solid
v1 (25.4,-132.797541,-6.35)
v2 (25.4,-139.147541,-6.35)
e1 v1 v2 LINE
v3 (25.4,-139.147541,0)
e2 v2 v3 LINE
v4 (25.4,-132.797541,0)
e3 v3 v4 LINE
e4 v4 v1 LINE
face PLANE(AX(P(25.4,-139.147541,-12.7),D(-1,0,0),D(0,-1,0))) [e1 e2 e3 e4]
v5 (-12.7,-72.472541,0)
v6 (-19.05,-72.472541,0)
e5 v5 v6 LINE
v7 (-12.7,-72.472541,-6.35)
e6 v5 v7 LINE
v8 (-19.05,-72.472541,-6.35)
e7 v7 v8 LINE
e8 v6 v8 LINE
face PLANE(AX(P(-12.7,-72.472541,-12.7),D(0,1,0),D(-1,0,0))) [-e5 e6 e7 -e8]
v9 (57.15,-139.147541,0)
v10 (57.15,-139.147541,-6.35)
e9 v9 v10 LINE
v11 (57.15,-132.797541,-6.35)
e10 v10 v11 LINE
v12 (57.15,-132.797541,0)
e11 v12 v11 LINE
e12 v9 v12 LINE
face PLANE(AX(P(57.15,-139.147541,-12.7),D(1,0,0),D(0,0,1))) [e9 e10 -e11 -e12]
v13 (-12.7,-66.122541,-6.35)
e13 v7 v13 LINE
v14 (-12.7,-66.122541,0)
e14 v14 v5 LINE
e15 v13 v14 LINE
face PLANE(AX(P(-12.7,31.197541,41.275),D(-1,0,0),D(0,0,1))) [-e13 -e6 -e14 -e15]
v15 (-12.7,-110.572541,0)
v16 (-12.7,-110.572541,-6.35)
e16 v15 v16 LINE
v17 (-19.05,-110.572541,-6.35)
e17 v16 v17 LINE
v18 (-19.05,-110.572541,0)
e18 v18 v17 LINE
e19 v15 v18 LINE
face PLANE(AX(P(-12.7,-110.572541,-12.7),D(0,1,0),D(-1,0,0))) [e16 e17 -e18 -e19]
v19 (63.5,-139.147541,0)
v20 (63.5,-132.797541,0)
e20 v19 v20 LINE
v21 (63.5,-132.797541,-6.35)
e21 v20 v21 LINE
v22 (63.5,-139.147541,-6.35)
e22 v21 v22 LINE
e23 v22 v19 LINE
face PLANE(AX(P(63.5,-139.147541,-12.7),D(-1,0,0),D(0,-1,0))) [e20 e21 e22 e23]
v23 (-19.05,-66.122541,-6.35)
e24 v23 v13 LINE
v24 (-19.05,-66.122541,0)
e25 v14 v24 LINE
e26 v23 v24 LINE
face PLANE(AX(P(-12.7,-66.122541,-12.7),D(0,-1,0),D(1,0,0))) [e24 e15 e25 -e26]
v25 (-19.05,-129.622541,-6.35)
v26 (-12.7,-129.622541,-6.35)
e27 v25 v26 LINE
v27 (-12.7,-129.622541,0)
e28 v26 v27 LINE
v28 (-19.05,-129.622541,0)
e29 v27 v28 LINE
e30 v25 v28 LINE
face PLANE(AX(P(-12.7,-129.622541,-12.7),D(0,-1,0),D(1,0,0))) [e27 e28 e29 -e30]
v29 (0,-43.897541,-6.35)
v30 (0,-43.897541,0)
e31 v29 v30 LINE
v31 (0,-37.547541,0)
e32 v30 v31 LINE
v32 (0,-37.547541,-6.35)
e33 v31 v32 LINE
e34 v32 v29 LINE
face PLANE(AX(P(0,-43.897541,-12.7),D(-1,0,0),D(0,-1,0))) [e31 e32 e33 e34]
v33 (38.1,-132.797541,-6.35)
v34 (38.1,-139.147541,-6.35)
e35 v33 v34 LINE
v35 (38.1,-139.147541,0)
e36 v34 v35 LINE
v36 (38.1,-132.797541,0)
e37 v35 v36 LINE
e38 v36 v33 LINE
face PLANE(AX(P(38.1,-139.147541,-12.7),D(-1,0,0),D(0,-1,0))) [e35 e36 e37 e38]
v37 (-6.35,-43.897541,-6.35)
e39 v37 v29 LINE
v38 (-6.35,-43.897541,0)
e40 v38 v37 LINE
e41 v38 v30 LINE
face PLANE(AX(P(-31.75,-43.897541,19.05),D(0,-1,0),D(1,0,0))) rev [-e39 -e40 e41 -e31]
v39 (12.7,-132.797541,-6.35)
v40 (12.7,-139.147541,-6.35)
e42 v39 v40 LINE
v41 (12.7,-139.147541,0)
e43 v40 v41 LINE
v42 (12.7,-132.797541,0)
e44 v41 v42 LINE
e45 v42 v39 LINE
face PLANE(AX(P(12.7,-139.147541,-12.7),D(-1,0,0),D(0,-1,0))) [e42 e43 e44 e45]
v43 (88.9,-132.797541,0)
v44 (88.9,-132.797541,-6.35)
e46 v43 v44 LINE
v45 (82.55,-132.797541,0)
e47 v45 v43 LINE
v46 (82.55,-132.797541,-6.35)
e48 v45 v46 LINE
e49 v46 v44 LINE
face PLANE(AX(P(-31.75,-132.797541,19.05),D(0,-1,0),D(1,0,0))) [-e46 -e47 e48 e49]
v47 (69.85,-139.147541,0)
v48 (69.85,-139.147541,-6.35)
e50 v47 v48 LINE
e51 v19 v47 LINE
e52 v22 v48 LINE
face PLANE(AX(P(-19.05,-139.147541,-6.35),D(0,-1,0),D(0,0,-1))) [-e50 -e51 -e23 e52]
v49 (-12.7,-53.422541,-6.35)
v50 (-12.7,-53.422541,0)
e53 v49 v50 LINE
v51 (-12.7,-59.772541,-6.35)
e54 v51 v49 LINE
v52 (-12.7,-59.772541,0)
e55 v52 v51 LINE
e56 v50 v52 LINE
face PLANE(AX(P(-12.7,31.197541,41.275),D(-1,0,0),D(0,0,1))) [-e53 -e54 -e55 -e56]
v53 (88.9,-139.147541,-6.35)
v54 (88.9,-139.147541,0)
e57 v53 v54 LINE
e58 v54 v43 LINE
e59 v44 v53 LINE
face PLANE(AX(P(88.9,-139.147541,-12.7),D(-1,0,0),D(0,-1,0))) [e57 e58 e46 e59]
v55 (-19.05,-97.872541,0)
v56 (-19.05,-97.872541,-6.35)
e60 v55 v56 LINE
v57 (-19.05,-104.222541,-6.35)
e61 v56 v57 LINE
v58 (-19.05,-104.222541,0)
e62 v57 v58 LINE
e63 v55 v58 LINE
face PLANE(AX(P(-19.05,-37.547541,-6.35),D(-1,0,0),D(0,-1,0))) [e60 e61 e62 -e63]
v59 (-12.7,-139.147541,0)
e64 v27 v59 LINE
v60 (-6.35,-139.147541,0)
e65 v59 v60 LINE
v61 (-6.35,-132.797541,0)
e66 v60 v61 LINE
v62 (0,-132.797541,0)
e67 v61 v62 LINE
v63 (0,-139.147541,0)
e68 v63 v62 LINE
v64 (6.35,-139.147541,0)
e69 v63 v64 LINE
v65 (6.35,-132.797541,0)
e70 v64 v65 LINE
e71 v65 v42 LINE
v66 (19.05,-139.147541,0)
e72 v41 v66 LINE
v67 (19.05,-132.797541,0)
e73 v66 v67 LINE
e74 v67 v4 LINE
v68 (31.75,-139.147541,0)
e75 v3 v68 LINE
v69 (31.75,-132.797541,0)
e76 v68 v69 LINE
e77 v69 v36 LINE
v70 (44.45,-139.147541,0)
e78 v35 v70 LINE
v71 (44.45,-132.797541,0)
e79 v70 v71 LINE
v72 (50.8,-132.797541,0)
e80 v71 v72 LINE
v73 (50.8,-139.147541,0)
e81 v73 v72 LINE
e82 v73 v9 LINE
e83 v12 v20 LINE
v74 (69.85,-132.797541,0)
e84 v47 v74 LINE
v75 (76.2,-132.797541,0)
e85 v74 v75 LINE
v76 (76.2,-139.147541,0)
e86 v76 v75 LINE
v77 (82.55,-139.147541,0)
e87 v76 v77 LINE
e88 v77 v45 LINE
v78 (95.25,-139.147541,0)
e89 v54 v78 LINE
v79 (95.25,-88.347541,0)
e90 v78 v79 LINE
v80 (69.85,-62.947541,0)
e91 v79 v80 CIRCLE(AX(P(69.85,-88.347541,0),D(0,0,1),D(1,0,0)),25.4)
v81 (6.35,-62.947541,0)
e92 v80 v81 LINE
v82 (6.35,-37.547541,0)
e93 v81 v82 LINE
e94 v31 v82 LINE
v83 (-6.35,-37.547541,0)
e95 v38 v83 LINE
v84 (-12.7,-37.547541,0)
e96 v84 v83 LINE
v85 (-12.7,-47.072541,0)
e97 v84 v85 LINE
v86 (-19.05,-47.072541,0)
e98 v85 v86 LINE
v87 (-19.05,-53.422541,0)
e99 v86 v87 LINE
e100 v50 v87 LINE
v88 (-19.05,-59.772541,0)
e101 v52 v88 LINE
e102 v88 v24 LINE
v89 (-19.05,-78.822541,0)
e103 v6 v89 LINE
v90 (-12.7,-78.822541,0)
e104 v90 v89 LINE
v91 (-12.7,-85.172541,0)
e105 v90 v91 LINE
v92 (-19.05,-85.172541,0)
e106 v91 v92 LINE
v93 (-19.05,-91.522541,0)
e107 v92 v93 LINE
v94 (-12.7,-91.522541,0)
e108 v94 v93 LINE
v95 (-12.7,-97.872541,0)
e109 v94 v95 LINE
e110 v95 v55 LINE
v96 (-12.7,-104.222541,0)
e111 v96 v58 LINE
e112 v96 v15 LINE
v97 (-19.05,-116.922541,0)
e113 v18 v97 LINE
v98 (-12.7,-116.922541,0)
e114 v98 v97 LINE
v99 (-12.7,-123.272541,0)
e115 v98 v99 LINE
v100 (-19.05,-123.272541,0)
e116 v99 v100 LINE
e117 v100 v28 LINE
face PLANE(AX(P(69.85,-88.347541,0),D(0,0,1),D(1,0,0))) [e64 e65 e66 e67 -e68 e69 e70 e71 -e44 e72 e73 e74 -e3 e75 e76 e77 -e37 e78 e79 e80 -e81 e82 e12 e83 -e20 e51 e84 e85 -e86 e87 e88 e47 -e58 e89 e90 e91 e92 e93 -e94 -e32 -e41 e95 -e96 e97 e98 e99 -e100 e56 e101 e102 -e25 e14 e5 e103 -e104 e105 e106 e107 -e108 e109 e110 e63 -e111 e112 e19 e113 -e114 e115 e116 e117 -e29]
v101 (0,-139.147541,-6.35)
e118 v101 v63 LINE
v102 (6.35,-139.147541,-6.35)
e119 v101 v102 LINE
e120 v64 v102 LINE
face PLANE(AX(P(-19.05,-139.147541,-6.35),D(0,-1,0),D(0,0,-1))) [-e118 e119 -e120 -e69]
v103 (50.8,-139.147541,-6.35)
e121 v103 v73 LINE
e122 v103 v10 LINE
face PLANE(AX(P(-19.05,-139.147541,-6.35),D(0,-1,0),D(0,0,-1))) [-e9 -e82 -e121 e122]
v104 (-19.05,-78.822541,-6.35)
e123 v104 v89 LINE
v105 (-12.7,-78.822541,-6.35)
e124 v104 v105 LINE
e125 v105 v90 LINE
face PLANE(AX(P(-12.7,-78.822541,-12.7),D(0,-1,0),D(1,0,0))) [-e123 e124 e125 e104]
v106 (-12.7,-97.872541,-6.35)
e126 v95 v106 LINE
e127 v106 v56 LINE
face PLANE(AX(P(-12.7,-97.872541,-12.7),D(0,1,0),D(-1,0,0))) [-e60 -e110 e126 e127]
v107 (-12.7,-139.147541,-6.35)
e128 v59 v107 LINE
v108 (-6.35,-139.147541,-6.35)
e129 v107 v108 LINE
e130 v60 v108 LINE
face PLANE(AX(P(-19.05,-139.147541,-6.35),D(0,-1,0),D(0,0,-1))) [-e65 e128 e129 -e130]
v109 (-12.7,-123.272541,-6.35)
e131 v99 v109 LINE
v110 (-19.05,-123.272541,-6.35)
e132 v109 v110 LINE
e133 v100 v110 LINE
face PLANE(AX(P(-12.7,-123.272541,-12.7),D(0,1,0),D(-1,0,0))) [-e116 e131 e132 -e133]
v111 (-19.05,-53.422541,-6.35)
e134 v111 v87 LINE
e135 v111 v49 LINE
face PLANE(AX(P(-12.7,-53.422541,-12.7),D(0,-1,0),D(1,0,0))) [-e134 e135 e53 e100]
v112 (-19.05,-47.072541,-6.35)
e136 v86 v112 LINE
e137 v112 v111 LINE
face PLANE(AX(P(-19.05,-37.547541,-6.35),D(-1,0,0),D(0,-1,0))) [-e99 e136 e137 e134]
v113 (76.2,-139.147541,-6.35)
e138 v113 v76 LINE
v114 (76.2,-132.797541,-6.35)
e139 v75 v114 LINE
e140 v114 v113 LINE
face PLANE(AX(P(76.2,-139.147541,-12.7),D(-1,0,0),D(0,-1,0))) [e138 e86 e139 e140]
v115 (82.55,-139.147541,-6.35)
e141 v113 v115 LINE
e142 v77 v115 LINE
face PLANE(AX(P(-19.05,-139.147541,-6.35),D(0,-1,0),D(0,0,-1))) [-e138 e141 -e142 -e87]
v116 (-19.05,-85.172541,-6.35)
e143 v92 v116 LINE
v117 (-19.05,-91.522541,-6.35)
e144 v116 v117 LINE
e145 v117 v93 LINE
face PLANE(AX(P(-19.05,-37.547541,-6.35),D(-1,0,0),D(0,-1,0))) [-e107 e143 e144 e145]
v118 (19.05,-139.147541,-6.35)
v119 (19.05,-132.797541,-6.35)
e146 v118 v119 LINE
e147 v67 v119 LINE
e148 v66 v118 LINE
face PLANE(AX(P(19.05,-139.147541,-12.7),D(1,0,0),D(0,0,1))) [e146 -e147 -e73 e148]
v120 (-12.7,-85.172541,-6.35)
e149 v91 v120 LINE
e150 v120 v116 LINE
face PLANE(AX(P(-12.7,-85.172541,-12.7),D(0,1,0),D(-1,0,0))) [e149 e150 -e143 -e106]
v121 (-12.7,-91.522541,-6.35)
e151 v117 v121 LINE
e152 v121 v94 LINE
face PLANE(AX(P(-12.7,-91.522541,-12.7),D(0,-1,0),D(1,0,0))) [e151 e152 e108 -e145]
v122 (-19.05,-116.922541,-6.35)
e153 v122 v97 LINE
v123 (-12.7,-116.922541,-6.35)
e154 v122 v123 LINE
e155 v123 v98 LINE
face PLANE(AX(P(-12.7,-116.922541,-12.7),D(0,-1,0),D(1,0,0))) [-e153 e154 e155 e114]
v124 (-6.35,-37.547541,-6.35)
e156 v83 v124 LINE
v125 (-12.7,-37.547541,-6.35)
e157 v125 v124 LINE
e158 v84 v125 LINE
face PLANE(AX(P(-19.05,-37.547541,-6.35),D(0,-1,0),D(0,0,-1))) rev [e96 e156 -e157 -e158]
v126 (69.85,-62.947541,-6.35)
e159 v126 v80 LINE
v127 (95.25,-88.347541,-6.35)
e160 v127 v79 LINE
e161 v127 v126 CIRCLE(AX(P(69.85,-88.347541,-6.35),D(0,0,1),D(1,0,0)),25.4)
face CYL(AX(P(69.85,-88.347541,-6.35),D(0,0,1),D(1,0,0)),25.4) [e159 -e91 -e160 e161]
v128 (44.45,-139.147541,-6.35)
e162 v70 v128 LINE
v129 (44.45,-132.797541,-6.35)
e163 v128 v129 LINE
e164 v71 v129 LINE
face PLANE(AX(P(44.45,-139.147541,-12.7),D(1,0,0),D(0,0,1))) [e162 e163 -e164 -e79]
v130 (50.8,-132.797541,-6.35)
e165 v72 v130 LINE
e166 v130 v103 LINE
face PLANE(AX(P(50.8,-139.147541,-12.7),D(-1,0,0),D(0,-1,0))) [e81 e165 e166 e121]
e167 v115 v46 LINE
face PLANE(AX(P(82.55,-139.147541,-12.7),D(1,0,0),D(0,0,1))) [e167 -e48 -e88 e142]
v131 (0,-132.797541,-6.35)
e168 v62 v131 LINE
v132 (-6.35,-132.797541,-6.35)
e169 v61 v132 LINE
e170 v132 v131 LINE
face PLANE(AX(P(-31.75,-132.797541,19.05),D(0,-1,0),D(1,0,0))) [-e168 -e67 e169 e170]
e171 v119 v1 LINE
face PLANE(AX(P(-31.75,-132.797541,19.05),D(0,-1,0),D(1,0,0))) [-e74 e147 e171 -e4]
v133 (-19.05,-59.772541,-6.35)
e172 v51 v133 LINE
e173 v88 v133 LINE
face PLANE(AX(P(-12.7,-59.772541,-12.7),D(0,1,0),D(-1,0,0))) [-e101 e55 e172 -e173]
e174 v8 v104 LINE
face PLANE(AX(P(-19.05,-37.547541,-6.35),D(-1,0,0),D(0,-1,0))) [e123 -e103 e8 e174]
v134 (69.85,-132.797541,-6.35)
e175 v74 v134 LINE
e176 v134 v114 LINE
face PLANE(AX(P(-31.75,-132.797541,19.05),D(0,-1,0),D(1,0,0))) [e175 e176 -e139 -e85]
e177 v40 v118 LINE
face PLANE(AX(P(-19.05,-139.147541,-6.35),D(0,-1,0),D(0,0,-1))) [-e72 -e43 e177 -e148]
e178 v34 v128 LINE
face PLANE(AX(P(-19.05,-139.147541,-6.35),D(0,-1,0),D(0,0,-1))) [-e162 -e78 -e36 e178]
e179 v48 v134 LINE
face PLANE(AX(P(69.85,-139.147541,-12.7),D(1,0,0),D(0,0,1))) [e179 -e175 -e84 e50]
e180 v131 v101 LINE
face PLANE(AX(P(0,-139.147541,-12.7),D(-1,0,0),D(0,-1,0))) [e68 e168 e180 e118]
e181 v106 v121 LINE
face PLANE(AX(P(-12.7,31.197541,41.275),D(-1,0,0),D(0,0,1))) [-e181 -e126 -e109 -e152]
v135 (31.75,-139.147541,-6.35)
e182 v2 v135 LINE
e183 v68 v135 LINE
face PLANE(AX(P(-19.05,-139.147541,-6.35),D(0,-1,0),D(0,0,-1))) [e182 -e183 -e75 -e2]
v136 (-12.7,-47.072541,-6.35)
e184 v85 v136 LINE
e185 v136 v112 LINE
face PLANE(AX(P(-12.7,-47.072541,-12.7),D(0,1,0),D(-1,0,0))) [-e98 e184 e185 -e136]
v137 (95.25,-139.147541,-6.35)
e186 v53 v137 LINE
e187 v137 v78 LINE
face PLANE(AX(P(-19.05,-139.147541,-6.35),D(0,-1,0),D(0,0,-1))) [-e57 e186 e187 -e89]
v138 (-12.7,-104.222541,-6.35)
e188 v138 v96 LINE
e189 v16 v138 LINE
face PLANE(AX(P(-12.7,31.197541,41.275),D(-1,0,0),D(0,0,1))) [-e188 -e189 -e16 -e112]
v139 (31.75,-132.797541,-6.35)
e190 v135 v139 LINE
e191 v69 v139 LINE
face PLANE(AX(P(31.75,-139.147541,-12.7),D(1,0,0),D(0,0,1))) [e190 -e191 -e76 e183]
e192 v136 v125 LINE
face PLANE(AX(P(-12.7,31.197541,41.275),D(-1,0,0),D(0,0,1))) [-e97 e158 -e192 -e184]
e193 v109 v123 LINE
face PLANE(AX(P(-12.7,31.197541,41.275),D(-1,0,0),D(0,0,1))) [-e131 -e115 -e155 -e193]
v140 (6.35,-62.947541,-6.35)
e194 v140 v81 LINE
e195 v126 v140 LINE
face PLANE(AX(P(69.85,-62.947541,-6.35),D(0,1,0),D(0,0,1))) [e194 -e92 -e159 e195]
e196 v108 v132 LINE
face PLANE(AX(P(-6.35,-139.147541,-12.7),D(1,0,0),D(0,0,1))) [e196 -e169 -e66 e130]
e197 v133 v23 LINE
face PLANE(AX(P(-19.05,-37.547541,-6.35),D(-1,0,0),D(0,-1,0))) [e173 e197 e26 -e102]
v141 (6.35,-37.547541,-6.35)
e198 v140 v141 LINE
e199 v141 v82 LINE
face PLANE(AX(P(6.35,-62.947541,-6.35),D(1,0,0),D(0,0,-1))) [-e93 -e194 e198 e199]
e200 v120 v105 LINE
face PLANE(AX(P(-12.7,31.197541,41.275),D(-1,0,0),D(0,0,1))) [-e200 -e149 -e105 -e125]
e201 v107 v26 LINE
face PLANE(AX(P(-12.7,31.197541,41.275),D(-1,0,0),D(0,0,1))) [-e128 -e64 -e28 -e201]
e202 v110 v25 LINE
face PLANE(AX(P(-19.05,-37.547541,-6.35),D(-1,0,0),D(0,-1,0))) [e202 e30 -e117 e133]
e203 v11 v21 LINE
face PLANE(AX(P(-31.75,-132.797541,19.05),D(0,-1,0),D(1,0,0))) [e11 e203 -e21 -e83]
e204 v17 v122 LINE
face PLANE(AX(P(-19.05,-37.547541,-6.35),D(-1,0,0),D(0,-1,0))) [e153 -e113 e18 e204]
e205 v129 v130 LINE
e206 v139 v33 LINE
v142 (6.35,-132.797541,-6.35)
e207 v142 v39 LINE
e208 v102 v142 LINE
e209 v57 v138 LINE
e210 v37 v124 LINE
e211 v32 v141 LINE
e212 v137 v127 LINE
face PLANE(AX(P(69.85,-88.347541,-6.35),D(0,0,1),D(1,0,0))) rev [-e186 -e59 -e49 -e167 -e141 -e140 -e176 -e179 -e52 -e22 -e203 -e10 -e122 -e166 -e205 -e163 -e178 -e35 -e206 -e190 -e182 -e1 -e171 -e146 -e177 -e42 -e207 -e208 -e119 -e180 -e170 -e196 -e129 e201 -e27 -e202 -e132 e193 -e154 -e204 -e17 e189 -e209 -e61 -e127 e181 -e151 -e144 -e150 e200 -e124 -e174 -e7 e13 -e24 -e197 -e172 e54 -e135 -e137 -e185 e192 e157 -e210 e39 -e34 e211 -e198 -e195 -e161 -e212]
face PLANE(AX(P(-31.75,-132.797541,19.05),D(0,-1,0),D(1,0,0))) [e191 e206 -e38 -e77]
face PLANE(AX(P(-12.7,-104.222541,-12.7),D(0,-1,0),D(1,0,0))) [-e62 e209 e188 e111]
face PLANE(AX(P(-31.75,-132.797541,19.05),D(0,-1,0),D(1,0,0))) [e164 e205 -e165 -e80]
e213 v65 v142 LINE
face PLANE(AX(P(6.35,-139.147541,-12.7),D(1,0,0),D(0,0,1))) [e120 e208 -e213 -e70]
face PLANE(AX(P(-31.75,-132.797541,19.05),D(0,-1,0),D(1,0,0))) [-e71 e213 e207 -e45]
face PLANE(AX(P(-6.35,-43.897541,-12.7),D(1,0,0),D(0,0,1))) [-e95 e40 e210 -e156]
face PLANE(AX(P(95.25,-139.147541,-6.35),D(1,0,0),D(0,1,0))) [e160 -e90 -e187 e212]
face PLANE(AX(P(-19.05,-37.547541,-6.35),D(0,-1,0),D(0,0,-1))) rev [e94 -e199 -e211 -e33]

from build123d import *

# Parameters (mm, degrees)
BOSS_EXTRUDE1_DEPTH = 6.35
CAVITY2_START       = -19.049999998
CAVITY2_OUTLINE_W   = 9.525
CAVITY2_OUTLINE_H   = 6.35
CAVITY2_OUTLINE_W_2 = 6.35
CAVITY2_DEPTH       = 6.35
CAVITY2_START_2     = -6.349999998
CAVITY2_2_OUTLINE_W = 6.35
CAVITY2_2_OUTLINE_H = 6.35
CAVITY2_2_DEPTH     = 6.35
CAVITY2_START_3     = 6.350000002
CAVITY2_3_OUTLINE_W = 6.35
CAVITY2_3_OUTLINE_H = 6.35
CAVITY2_3_DEPTH     = 6.35
CAVITY2_START_4     = 19.050000002
CAVITY2_4_OUTLINE_W = 6.35
CAVITY2_4_OUTLINE_H = 6.35
CAVITY2_4_DEPTH     = 6.35
CAVITY2_START_5     = 31.750000002
CAVITY2_5_OUTLINE_W = 6.35
CAVITY2_5_OUTLINE_H = 6.35
CAVITY2_5_DEPTH     = 6.35
CAVITY2_START_6     = 44.450000002
CAVITY2_6_OUTLINE_W = 6.35
CAVITY2_6_OUTLINE_H = 6.35
CAVITY2_6_DEPTH     = 6.35
CAVITY2_START_7     = 57.150000002
CAVITY2_7_OUTLINE_W = 6.35
CAVITY2_7_OUTLINE_H = 6.35
CAVITY2_7_DEPTH     = 6.35
CAVITY2_START_8     = 69.850000002
CAVITY2_8_OUTLINE_W = 6.35
CAVITY2_8_OUTLINE_H = 6.35
CAVITY2_8_DEPTH     = 6.35
CAVITY2_START_9     = 82.550000002
CAVITY2_9_OUTLINE_W = 6.35
CAVITY2_9_OUTLINE_H = 6.35
CAVITY2_9_DEPTH     = 6.35


# Read off the part's stored shape, not the designer's step: Cavity2
with BuildPart() as part:
    # Sketch1 → Boss-Extrude1 (new body)
    with BuildSketch(Plane.XY):
        with BuildLine():
            Line((-19.049999998, -37.547541155), (6.350000002, -37.547541155))
            Line((6.350000002, -37.547541155), (6.350000002, -62.947541155))
            Line((6.350000002, -62.947541155), (69.850000002, -62.947541155))
            ThreePointArc((69.850000002, -62.947541155), (87.810512244, -70.387028913), (95.250000002, -88.347541155))
            Line((95.250000002, -88.347541155), (95.250000002, -139.147541155))
            Line((95.250000002, -139.147541155), (-19.049999998, -139.147541155))
            Line((-19.049999998, -139.147541155), (-19.049999998, -37.547541155))
        make_face()
    extrude(amount=-BOSS_EXTRUDE1_DEPTH)

    # Cavity2 outline → Cavity2 (cut)
    with BuildSketch(Plane.YZ.offset(CAVITY2_START)):
        with Locations((-134.385041155, -3.175)):
            Rectangle(CAVITY2_OUTLINE_W, CAVITY2_OUTLINE_H)
        with Locations((-120.097541155, -3.175)):
            Rectangle(CAVITY2_OUTLINE_W_2, CAVITY2_OUTLINE_H)
        with Locations((-107.397541155, -3.175)):
            Rectangle(CAVITY2_OUTLINE_W_2, CAVITY2_OUTLINE_H)
        with Locations((-94.697541155, -3.175)):
            Rectangle(CAVITY2_OUTLINE_W_2, CAVITY2_OUTLINE_H)
        with Locations((-81.997541155, -3.175)):
            Rectangle(CAVITY2_OUTLINE_W_2, CAVITY2_OUTLINE_H)
        with Locations((-69.297541155, -3.175)):
            Rectangle(CAVITY2_OUTLINE_W_2, CAVITY2_OUTLINE_H)
        with Locations((-56.597541155, -3.175)):
            Rectangle(CAVITY2_OUTLINE_W_2, CAVITY2_OUTLINE_H)
        with Locations((-42.310041155, -3.175)):
            Rectangle(CAVITY2_OUTLINE_W, CAVITY2_OUTLINE_H)
    extrude(amount=CAVITY2_DEPTH, mode=Mode.SUBTRACT)

    # Cavity2 2 outline → Cavity2 2 (cut)
    with BuildSketch(Plane.YZ.offset(CAVITY2_START_2)):
        with Locations((-135.972541155, -3.175)):
            Rectangle(CAVITY2_2_OUTLINE_W, CAVITY2_2_OUTLINE_H)
        with Locations((-40.722541155, -3.175)):
            Rectangle(CAVITY2_2_OUTLINE_W, CAVITY2_2_OUTLINE_H)
    extrude(amount=CAVITY2_2_DEPTH, mode=Mode.SUBTRACT)

    # Cavity2 3 outline → Cavity2 3 (cut)
    with BuildSketch(Plane.YZ.offset(CAVITY2_START_3)):
        with Locations((-135.972541155, -3.175)):
            Rectangle(CAVITY2_3_OUTLINE_W, CAVITY2_3_OUTLINE_H)
    extrude(amount=CAVITY2_3_DEPTH, mode=Mode.SUBTRACT)

    # Cavity2 4 outline → Cavity2 4 (cut)
    with BuildSketch(Plane.YZ.offset(CAVITY2_START_4)):
        with Locations((-135.972541155, -3.175)):
            Rectangle(CAVITY2_4_OUTLINE_W, CAVITY2_4_OUTLINE_H)
    extrude(amount=CAVITY2_4_DEPTH, mode=Mode.SUBTRACT)

    # Cavity2 5 outline → Cavity2 5 (cut)
    with BuildSketch(Plane.YZ.offset(CAVITY2_START_5)):
        with Locations((-135.972541155, -3.175)):
            Rectangle(CAVITY2_5_OUTLINE_W, CAVITY2_5_OUTLINE_H)
    extrude(amount=CAVITY2_5_DEPTH, mode=Mode.SUBTRACT)

    # Cavity2 6 outline → Cavity2 6 (cut)
    with BuildSketch(Plane.YZ.offset(CAVITY2_START_6)):
        with Locations((-135.972541155, -3.175)):
            Rectangle(CAVITY2_6_OUTLINE_W, CAVITY2_6_OUTLINE_H)
    extrude(amount=CAVITY2_6_DEPTH, mode=Mode.SUBTRACT)

    # Cavity2 7 outline → Cavity2 7 (cut)
    with BuildSketch(Plane.YZ.offset(CAVITY2_START_7)):
        with Locations((-135.972541155, -3.175)):
            Rectangle(CAVITY2_7_OUTLINE_W, CAVITY2_7_OUTLINE_H)
    extrude(amount=CAVITY2_7_DEPTH, mode=Mode.SUBTRACT)

    # Cavity2 8 outline → Cavity2 8 (cut)
    with BuildSketch(Plane.YZ.offset(CAVITY2_START_8)):
        with Locations((-135.972541155, -3.175)):
            Rectangle(CAVITY2_8_OUTLINE_W, CAVITY2_8_OUTLINE_H)
    extrude(amount=CAVITY2_8_DEPTH, mode=Mode.SUBTRACT)

    # Cavity2 9 outline → Cavity2 9 (cut)
    with BuildSketch(Plane.YZ.offset(CAVITY2_START_9)):
        with Locations((-135.972541155, -3.175)):
            Rectangle(CAVITY2_9_OUTLINE_W, CAVITY2_9_OUTLINE_H)
    extrude(amount=CAVITY2_9_DEPTH, mode=Mode.SUBTRACT)


solid = part.part
